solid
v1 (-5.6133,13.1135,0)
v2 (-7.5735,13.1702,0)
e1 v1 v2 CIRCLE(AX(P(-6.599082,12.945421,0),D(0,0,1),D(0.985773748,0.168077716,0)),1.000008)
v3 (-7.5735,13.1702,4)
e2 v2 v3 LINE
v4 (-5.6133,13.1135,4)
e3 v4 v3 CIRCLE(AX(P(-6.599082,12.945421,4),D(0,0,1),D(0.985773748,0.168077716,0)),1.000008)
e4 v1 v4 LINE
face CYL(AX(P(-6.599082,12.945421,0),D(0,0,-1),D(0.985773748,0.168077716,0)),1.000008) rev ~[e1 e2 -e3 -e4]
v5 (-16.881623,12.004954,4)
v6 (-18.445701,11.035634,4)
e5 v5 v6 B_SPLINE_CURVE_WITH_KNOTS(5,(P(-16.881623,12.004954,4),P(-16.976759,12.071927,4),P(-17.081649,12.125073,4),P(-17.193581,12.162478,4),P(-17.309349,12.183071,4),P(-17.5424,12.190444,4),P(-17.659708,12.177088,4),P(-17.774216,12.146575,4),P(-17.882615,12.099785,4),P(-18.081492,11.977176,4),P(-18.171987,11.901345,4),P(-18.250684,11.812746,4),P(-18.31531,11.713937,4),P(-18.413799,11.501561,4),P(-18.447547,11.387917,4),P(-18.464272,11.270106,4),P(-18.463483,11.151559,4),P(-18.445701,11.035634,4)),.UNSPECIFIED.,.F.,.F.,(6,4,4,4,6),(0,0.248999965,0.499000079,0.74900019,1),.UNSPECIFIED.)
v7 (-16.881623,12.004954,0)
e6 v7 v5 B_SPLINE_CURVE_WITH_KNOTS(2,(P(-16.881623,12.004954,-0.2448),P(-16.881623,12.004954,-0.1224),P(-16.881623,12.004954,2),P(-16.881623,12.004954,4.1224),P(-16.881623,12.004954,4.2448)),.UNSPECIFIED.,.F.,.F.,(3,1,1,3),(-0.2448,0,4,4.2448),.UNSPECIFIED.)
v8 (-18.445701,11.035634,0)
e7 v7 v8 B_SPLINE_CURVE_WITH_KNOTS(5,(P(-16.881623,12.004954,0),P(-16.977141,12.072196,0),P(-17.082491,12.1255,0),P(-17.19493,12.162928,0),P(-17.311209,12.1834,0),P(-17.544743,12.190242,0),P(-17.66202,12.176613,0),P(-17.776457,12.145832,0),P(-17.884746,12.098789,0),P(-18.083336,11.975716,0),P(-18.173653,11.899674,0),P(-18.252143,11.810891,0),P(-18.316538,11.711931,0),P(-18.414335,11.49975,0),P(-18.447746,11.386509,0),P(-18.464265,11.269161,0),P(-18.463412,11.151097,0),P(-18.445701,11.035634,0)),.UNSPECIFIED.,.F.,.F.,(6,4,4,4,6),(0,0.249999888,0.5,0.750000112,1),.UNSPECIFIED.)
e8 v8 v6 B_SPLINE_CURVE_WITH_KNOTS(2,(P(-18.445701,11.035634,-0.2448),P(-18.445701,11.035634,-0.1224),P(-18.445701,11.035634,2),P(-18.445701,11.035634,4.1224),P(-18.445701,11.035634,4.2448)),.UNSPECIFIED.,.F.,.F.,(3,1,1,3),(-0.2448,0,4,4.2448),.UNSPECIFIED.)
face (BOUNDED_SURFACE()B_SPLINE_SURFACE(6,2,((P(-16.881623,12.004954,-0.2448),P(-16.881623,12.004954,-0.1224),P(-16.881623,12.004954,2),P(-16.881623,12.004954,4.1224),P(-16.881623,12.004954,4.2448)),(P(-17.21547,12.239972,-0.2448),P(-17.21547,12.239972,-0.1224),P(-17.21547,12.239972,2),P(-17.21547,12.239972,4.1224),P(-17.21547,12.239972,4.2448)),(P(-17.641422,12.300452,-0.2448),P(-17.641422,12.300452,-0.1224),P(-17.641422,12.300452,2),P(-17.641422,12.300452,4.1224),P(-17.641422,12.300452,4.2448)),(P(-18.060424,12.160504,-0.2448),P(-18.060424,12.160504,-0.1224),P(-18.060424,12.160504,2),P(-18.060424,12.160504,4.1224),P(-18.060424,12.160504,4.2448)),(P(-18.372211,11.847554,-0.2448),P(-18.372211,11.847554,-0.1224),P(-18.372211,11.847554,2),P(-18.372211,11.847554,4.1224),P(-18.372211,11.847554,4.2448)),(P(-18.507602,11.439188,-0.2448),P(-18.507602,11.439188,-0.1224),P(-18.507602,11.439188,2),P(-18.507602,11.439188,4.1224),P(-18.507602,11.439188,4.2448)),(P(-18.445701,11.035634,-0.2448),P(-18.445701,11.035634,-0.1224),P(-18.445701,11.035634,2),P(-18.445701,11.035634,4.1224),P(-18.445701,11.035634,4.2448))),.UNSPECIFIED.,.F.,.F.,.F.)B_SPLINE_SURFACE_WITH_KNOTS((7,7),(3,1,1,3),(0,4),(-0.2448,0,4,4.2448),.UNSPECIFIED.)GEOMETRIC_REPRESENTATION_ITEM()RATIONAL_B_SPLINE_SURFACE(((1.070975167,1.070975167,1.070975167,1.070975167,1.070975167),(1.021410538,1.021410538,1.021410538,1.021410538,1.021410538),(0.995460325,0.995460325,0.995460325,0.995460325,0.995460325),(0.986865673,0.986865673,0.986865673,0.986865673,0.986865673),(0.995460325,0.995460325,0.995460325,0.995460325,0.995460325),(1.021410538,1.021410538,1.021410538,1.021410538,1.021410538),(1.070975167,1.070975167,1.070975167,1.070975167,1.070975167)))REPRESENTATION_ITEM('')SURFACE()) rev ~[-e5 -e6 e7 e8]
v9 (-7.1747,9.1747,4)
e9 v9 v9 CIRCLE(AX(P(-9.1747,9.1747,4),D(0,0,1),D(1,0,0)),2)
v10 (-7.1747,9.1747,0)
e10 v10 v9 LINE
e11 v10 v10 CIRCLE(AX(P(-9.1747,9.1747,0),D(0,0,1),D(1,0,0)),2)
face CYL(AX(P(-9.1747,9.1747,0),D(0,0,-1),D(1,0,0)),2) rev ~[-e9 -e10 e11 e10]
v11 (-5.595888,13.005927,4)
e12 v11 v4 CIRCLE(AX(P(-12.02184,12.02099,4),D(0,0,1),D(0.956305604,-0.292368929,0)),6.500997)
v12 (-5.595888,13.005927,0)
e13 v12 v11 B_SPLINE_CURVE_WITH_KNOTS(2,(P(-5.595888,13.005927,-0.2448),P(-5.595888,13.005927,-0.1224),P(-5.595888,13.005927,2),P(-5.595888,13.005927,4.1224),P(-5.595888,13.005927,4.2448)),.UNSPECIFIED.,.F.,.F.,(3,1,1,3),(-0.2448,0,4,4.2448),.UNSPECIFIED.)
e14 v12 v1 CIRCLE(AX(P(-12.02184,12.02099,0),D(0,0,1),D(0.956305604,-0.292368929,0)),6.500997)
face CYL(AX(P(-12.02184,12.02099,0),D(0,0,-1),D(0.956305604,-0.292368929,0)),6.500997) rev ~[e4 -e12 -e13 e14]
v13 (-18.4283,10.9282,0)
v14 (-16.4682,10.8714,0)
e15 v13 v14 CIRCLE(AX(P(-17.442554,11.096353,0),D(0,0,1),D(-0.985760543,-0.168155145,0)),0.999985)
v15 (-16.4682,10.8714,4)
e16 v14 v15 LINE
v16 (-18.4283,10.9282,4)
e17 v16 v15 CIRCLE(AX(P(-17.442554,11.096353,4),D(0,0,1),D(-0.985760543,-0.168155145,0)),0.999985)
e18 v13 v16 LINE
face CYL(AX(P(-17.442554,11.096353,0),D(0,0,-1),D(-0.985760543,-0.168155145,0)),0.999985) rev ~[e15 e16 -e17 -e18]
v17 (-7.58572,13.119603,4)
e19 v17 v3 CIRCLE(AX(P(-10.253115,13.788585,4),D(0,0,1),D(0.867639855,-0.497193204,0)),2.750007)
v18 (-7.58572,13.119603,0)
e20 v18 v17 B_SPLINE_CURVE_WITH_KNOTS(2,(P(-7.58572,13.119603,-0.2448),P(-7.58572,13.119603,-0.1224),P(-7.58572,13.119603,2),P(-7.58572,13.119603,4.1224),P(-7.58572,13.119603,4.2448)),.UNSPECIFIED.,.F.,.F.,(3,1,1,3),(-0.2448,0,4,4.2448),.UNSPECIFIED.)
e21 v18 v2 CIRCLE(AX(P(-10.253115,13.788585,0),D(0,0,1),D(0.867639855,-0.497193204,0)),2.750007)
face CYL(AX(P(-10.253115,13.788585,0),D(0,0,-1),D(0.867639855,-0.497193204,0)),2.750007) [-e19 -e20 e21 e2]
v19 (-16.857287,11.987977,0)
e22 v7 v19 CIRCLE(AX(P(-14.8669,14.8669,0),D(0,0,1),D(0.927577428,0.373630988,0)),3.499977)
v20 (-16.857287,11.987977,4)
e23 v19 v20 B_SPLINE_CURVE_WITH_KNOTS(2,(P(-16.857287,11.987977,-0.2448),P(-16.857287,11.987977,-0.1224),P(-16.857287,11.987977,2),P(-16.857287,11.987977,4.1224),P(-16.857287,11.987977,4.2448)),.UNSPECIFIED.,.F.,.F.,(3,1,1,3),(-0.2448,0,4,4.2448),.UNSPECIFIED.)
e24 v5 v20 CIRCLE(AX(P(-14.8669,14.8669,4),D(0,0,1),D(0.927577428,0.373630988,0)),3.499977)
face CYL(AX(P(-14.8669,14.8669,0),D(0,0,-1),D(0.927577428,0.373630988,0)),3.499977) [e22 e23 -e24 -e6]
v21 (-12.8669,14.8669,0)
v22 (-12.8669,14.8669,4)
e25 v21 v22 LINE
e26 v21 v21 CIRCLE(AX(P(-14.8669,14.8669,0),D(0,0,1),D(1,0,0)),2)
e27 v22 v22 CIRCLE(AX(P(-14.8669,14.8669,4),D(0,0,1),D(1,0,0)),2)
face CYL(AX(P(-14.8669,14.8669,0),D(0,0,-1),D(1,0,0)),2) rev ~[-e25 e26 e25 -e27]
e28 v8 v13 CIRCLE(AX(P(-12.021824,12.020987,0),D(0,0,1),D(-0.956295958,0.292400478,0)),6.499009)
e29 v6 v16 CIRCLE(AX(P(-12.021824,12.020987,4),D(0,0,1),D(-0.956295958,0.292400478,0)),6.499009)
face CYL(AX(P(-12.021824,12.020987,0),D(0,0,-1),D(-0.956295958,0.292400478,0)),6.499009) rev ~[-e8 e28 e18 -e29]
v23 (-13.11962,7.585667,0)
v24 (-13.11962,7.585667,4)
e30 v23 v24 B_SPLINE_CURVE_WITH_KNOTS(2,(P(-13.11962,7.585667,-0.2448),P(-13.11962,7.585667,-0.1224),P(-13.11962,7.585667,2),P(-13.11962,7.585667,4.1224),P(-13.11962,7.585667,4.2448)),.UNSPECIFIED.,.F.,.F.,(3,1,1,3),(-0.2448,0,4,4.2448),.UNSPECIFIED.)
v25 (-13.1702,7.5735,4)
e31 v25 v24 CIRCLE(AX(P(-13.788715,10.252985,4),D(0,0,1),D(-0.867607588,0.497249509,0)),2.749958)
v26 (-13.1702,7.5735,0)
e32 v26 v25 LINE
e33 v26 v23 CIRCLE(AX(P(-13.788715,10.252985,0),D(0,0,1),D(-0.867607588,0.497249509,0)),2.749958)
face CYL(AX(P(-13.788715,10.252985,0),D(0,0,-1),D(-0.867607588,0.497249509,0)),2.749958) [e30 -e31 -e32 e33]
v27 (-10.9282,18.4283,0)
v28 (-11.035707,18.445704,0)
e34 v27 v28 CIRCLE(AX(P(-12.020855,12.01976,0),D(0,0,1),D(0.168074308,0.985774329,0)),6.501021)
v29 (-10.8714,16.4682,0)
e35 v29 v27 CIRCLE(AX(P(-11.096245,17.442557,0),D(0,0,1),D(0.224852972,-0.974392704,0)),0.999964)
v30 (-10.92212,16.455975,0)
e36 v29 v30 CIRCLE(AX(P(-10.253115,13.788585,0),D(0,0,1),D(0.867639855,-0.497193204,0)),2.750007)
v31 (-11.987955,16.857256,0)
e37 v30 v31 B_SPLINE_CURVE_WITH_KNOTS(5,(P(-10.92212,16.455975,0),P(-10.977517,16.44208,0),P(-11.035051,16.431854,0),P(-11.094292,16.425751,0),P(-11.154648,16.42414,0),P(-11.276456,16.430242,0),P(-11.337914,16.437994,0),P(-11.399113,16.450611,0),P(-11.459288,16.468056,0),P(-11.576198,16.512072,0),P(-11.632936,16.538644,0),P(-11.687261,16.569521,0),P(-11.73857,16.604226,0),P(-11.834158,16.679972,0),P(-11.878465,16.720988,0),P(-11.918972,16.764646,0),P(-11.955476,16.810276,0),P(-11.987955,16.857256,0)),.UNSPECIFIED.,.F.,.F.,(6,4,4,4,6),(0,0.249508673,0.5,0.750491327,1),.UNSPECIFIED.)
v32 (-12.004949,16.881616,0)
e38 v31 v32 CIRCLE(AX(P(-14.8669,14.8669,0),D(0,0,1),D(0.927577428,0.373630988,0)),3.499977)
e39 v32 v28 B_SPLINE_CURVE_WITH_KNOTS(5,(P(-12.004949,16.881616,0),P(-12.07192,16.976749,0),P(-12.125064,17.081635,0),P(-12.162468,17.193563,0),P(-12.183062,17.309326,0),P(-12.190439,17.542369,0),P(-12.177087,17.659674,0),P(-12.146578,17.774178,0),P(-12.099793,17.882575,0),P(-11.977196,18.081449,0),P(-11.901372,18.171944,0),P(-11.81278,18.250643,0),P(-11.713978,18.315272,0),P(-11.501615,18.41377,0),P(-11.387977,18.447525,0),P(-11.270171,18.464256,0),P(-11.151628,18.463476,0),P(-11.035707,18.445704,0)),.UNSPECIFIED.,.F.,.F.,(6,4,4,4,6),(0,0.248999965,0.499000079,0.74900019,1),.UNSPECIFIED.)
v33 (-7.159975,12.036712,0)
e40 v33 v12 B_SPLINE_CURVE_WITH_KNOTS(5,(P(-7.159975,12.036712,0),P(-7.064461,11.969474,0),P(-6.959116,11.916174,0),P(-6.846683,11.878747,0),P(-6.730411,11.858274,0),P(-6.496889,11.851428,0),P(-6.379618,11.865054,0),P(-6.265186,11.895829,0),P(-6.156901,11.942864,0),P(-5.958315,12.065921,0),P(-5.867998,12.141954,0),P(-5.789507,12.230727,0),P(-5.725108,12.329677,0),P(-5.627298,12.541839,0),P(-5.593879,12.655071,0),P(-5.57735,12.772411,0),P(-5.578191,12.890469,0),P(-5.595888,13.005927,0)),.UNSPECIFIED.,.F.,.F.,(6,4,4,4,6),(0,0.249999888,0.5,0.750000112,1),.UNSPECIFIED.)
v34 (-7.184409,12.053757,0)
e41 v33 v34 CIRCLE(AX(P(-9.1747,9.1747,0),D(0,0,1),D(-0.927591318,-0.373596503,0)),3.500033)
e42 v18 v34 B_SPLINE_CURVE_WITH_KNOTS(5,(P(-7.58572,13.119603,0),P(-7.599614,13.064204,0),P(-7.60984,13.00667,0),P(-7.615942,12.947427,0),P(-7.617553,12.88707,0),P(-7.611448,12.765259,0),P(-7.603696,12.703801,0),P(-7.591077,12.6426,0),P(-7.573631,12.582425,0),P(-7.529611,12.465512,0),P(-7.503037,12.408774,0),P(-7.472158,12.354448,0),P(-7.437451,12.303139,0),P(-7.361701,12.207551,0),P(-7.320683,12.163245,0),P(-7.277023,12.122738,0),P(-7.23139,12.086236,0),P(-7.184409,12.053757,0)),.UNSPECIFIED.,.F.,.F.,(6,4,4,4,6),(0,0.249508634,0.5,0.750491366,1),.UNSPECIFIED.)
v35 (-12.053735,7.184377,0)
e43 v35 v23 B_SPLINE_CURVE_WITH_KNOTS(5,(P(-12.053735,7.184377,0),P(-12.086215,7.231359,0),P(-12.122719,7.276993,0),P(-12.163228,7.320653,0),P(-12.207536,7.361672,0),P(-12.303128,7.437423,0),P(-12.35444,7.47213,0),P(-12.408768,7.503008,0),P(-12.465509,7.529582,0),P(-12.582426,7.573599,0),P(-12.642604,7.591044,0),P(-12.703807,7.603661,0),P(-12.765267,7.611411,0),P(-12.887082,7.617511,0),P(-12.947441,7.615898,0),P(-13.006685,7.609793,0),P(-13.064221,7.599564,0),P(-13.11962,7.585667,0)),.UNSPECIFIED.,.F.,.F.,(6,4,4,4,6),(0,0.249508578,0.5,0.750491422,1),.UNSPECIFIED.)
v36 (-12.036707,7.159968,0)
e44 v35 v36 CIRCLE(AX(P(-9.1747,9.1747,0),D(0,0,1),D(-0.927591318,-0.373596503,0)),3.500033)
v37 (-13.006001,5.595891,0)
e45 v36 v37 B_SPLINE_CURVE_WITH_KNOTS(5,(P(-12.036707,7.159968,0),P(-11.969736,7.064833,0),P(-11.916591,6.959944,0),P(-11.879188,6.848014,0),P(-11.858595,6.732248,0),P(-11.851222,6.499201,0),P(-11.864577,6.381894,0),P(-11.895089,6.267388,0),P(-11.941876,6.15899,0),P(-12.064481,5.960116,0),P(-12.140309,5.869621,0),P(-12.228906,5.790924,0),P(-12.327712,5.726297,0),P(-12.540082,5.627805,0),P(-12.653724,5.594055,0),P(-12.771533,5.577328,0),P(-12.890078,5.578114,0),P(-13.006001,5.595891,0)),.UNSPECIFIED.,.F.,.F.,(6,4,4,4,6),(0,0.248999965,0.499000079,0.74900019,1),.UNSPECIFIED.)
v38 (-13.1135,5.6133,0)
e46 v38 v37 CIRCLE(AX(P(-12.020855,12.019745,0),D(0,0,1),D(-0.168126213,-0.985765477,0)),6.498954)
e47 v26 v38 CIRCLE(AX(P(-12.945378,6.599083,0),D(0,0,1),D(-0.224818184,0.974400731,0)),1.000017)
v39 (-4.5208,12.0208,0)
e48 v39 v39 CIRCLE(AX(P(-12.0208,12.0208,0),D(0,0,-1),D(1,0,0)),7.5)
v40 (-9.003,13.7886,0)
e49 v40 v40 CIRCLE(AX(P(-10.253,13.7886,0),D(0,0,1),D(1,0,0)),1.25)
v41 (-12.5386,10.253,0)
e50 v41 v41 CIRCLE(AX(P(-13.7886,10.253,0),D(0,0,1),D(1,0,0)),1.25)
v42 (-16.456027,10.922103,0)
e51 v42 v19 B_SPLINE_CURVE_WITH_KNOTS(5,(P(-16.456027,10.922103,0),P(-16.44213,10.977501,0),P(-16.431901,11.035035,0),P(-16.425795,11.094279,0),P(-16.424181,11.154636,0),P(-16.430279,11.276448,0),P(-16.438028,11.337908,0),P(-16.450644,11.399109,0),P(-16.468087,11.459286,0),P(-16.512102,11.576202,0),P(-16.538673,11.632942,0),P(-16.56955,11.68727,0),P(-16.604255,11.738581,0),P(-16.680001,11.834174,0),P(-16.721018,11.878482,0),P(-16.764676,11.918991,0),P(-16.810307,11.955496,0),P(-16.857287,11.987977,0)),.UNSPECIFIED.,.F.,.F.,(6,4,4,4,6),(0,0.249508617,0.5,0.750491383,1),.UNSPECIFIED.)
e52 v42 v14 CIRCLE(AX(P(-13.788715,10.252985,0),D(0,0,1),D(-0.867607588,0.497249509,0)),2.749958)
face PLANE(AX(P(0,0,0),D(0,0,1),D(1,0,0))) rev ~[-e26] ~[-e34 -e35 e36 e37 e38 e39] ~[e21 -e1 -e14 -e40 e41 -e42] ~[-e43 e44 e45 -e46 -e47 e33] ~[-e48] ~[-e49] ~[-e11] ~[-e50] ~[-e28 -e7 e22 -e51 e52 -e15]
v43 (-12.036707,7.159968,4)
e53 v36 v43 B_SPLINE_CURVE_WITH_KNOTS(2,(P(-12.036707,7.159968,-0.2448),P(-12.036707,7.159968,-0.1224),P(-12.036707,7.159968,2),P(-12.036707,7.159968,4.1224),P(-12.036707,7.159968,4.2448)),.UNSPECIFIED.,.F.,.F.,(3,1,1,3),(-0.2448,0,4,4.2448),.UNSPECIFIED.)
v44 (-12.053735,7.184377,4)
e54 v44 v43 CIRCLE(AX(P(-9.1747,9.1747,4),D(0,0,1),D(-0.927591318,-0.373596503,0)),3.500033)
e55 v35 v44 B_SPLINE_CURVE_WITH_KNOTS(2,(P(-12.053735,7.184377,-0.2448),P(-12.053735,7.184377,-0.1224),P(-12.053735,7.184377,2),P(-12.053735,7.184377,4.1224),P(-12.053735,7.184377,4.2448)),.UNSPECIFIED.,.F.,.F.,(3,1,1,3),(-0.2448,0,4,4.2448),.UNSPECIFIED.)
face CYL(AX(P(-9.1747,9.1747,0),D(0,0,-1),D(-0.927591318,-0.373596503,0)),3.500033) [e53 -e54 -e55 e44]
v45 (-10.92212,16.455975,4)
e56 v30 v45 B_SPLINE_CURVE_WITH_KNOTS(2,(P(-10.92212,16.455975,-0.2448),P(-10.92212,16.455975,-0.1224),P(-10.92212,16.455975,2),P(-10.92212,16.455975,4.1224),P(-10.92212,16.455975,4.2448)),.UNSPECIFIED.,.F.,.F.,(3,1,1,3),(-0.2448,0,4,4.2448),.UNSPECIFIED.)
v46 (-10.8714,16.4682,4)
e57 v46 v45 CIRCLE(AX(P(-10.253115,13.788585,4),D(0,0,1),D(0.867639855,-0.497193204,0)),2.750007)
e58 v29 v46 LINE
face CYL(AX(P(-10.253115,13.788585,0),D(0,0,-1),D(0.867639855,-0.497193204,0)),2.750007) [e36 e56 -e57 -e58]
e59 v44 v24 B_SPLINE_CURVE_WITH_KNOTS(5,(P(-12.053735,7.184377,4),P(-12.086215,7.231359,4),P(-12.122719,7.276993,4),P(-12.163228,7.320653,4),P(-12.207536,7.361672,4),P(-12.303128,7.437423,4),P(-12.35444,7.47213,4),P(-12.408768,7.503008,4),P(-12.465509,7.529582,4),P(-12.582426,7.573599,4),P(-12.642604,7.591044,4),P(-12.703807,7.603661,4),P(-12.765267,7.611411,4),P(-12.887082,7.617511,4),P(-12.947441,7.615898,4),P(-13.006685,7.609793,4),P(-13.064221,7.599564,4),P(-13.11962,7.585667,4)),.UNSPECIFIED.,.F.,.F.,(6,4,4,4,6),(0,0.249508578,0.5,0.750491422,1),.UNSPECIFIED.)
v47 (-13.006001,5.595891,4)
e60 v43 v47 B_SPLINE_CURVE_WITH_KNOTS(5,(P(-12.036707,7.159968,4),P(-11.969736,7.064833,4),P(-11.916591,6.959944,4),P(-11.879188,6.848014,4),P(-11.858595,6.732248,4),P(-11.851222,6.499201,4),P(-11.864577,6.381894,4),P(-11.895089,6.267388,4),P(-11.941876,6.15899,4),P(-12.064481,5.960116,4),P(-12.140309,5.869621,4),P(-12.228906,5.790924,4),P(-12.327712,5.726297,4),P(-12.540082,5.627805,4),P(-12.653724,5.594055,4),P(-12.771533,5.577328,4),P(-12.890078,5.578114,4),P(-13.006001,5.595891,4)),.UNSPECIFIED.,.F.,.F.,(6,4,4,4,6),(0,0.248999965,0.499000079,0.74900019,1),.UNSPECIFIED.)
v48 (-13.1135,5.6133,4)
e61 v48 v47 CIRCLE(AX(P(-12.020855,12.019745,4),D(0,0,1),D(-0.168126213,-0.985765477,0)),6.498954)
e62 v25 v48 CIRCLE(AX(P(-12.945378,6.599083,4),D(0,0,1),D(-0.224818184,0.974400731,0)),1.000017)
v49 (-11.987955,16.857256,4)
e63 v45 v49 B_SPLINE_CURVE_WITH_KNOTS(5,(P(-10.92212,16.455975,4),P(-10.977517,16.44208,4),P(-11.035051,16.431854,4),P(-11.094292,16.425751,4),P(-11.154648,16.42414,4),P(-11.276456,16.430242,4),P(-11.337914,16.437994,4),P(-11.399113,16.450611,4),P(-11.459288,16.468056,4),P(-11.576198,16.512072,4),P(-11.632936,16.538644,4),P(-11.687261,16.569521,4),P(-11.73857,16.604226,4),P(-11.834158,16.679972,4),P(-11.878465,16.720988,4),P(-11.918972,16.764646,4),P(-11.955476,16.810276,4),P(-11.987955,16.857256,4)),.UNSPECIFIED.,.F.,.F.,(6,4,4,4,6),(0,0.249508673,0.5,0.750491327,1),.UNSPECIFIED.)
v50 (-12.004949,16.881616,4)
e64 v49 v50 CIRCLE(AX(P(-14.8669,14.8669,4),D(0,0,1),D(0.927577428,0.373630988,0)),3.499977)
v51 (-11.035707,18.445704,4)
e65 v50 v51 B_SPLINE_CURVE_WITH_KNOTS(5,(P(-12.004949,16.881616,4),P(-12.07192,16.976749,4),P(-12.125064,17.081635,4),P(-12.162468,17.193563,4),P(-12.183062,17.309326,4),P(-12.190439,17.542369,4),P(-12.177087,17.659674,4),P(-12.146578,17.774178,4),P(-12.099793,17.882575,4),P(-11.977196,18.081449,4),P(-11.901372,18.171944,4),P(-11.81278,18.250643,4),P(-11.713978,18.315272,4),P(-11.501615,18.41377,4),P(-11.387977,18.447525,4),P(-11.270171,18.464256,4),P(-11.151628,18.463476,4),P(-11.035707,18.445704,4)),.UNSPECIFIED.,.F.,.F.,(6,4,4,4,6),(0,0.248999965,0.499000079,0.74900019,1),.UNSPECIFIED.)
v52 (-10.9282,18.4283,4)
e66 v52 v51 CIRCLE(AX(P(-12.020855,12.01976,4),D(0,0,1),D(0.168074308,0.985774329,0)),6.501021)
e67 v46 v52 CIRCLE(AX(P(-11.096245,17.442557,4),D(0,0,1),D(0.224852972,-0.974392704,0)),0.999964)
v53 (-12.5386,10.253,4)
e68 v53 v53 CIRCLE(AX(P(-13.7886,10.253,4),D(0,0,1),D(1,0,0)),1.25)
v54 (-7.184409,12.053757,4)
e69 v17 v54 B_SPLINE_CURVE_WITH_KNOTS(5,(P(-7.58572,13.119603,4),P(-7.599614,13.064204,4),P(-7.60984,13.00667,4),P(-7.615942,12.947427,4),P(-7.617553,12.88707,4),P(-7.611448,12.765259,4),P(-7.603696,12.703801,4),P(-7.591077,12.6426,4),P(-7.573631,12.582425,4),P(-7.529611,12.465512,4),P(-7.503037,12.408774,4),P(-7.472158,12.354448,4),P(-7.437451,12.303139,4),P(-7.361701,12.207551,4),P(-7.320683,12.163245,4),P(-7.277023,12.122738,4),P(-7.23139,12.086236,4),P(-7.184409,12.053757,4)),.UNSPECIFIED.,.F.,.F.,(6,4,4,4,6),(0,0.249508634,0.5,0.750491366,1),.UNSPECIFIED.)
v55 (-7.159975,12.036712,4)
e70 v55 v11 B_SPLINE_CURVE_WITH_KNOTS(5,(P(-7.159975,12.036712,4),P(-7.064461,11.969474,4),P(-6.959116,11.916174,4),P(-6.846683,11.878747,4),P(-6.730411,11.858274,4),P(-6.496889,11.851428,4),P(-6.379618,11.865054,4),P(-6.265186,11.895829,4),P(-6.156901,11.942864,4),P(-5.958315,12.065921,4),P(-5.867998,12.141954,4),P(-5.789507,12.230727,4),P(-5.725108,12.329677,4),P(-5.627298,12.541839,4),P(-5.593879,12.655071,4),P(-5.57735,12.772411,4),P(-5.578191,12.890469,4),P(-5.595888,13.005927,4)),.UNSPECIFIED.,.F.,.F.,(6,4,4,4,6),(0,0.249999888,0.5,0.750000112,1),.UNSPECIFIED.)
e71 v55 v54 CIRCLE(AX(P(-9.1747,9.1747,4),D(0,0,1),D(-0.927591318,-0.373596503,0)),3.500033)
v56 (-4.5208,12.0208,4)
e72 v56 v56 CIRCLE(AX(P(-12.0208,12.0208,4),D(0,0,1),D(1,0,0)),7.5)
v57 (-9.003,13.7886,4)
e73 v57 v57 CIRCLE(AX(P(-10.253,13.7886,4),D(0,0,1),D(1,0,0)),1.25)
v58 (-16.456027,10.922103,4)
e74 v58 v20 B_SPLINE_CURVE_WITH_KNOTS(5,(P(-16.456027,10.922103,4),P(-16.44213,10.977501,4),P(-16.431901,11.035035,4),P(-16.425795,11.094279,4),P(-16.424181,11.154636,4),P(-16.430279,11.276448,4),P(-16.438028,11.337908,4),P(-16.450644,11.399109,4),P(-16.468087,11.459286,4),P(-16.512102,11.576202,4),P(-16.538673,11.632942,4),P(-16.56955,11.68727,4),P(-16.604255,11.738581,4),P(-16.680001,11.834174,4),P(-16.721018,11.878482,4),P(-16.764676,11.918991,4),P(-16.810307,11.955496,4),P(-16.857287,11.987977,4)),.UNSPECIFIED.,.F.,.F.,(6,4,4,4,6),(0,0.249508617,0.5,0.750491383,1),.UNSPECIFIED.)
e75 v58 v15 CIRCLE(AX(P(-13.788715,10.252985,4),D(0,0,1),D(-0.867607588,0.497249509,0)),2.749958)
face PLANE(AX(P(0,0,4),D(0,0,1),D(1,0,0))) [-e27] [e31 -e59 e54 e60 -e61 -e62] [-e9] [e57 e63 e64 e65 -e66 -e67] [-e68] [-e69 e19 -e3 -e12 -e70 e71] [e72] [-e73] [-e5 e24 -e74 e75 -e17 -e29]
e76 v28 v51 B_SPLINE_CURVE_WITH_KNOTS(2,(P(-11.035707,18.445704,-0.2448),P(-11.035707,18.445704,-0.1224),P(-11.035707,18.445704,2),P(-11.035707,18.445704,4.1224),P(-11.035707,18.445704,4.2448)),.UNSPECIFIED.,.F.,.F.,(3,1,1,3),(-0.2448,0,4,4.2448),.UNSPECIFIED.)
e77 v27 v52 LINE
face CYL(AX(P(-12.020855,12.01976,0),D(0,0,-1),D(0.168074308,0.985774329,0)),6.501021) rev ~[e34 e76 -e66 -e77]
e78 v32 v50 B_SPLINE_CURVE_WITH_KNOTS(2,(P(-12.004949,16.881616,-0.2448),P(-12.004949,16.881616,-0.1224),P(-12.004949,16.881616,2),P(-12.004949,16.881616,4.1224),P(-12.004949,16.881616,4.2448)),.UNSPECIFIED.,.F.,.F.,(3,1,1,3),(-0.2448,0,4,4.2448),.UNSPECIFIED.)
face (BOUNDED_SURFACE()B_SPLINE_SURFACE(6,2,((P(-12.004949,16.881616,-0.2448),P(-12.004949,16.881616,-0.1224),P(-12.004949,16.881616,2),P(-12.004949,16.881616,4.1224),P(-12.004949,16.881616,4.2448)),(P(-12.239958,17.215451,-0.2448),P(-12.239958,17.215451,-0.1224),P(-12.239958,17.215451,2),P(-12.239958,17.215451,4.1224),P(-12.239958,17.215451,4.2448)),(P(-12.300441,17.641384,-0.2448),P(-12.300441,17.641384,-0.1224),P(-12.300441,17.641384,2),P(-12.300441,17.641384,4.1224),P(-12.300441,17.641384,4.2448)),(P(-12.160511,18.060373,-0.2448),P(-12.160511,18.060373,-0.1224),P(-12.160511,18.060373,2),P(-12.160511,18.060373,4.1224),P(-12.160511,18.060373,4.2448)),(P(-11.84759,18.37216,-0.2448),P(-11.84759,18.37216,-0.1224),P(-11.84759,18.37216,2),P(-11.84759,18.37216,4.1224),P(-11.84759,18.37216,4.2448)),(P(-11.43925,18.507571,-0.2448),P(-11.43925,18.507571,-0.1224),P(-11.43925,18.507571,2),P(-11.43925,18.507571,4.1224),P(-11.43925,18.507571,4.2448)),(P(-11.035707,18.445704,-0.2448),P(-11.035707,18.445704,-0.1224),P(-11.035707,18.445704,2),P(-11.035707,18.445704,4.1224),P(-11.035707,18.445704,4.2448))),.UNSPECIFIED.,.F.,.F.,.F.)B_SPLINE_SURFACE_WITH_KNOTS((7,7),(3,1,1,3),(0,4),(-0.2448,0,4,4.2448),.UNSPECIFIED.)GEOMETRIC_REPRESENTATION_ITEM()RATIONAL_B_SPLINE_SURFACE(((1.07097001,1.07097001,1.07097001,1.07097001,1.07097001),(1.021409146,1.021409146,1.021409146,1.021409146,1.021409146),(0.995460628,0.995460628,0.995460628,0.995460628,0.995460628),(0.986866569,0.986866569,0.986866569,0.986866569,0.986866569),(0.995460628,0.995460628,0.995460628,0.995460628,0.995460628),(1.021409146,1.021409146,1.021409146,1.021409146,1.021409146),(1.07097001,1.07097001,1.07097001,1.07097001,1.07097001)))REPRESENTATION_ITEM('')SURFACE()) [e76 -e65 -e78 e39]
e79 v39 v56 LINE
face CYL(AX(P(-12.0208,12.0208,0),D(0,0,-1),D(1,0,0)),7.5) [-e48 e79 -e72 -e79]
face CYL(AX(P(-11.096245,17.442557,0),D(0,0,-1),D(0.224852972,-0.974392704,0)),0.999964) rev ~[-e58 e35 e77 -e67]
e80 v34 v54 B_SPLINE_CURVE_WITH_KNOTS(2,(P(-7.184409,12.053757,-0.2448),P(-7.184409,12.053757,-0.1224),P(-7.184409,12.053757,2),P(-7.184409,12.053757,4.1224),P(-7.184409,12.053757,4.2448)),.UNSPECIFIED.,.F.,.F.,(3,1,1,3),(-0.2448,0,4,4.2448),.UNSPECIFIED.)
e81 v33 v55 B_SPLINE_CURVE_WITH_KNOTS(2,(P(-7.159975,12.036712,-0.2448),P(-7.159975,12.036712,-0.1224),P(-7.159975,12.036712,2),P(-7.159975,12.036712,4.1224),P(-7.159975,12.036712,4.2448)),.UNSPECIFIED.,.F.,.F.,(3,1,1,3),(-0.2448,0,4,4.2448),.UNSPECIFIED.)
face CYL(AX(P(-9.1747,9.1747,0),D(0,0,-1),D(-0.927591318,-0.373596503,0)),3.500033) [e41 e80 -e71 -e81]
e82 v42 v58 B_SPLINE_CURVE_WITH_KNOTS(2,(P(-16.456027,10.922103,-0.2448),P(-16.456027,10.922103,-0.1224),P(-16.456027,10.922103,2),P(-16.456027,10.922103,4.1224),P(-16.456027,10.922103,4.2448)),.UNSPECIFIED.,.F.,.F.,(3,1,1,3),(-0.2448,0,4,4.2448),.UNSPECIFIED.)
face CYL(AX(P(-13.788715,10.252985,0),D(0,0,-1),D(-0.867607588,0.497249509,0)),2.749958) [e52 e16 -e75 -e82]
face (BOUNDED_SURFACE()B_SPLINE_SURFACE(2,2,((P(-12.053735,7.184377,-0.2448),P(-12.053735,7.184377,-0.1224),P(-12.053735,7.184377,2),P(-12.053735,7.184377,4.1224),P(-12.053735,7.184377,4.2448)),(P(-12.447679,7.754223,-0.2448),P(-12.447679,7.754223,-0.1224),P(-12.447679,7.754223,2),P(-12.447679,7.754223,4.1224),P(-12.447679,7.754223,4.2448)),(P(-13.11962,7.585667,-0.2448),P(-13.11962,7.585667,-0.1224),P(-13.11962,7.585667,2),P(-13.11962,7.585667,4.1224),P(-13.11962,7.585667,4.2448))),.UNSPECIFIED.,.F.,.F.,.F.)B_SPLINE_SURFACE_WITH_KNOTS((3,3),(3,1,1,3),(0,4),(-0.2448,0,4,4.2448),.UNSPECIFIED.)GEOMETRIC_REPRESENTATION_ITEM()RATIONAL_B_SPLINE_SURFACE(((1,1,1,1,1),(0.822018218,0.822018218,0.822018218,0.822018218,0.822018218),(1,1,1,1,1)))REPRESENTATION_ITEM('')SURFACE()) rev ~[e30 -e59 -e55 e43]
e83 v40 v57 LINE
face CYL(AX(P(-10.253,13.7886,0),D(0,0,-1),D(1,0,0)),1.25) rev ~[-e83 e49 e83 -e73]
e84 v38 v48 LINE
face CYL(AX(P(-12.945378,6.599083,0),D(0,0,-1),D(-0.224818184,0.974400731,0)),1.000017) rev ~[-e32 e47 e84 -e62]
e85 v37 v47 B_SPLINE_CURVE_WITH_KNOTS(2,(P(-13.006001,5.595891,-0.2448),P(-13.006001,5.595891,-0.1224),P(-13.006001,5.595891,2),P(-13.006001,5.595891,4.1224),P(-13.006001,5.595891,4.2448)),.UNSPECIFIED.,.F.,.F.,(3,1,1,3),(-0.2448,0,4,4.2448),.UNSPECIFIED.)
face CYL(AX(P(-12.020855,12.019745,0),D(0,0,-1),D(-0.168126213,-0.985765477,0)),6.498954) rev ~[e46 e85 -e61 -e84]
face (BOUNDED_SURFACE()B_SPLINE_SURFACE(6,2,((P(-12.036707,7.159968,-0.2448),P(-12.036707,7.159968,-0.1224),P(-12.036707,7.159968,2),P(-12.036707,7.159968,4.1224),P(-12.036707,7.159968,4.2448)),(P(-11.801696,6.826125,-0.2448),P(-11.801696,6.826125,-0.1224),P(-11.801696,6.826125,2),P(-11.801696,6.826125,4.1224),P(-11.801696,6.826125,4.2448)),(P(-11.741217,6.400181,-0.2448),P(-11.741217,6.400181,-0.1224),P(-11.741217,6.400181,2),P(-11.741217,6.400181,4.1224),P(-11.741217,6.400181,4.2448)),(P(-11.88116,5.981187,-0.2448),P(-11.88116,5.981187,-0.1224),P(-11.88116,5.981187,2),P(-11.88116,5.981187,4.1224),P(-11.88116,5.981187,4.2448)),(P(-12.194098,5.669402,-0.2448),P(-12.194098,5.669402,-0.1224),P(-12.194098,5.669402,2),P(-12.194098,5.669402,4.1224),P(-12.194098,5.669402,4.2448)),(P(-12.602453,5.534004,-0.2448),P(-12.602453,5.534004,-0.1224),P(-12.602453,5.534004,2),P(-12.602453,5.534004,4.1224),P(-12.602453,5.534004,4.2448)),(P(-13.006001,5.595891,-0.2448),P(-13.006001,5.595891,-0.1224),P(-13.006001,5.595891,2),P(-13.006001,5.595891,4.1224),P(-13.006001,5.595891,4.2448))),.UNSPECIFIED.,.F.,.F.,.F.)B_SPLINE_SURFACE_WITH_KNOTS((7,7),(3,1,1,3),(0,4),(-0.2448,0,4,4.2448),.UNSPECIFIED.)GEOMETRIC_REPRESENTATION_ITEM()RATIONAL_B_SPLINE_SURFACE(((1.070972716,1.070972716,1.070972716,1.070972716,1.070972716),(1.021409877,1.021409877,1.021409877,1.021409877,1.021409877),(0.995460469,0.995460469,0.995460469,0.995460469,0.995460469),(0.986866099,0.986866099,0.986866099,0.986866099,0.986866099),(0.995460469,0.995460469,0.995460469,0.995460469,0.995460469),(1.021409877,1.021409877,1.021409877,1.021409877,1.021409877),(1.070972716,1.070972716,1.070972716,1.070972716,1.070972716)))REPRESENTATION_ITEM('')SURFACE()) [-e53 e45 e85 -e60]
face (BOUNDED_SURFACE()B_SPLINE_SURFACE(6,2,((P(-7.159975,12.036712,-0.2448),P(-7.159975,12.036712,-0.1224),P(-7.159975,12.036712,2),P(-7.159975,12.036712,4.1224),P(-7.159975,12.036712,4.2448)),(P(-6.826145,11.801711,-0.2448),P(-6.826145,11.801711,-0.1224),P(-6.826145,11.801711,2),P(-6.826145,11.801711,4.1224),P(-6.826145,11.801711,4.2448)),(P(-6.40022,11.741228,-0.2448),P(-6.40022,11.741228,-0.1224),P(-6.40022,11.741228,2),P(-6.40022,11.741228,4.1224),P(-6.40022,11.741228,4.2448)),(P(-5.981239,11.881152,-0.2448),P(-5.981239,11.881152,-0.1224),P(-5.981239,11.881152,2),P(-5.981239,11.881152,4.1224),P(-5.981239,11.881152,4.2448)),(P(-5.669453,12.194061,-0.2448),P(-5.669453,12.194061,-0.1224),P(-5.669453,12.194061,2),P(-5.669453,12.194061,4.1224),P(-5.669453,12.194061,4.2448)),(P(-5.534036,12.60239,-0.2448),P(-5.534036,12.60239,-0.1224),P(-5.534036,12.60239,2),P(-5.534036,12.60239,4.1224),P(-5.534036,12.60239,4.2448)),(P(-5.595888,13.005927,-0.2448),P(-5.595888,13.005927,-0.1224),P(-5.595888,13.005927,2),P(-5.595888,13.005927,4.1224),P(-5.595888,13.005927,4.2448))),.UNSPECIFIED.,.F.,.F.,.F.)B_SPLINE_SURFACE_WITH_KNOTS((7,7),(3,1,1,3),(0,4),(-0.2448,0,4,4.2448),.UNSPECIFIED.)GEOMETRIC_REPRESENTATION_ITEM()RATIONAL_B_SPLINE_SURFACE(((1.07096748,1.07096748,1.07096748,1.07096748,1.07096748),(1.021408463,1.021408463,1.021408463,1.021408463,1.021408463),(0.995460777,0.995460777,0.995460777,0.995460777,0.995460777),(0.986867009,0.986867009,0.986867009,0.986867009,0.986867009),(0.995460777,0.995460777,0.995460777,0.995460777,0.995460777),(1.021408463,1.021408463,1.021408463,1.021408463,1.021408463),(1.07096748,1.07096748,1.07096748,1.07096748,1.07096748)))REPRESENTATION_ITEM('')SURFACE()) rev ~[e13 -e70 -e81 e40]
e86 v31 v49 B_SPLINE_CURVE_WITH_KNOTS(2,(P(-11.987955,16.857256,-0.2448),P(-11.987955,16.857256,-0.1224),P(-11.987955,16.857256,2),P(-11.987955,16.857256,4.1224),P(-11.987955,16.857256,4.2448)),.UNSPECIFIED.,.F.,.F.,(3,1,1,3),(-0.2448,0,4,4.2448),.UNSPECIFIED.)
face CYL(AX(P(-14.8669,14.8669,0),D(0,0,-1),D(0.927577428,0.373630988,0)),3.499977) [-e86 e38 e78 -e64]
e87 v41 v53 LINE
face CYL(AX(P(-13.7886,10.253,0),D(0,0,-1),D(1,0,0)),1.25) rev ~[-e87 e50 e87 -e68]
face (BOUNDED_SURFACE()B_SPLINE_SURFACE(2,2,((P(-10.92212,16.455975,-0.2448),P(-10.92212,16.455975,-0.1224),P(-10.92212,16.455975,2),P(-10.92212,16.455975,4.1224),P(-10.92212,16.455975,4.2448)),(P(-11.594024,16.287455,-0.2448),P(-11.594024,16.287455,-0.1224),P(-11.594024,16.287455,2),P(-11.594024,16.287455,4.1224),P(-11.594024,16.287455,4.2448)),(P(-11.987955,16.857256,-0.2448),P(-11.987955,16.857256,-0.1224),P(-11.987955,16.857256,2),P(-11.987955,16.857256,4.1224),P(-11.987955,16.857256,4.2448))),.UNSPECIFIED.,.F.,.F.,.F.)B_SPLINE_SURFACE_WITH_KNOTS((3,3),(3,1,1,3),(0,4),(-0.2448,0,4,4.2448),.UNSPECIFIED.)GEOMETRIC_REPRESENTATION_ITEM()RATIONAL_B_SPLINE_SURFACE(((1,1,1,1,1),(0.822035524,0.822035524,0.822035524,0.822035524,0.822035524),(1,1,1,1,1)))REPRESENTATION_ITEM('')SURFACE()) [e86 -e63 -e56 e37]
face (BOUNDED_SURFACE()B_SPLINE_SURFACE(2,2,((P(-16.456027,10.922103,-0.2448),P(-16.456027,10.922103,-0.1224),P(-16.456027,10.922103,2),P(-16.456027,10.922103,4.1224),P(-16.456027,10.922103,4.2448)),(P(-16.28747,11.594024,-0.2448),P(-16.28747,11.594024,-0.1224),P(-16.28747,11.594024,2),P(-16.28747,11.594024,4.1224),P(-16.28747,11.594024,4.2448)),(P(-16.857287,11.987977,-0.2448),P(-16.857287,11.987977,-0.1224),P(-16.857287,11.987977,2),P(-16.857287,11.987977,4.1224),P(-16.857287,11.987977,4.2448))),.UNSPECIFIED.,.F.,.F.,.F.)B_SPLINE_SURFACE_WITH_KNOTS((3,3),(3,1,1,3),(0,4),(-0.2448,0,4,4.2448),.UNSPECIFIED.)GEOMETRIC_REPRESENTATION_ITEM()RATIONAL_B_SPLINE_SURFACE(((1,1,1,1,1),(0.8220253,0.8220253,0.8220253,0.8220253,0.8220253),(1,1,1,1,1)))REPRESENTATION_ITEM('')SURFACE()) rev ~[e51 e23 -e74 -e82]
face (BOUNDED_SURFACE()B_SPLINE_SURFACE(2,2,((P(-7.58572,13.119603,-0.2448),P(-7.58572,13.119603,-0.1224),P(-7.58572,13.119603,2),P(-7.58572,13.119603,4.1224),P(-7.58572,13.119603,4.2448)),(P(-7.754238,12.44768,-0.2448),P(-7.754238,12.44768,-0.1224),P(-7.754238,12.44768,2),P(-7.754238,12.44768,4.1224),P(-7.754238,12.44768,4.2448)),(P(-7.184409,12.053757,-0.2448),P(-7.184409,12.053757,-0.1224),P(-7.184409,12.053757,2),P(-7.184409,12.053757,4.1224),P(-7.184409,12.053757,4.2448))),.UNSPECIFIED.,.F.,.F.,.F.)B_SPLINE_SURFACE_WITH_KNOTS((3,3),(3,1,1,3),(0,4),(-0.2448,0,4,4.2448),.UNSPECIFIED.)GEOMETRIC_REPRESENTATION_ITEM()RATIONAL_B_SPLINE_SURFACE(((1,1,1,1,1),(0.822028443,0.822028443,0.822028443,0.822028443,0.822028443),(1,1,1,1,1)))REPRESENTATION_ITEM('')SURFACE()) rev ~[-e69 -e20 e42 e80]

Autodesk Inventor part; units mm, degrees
ref_plane "YZ Plane" through (0, 0, 0) normal (1, 0, 0) x (0, 1, 0)
ref_plane "XZ Plane" through (0, 0, 0) normal (0, 1, 0) x (-1, 0, 0)
ref_plane "XY Plane" through (0, 0, 0) normal (0, 0, 1) x (1, 0, 0)
sketch "スケッチ1" plane through (0, 0, 0) normal (0, 0, 1) x (1, 0, 0)
  circle A0 centre (-12.0208, 12.0208) radius 9.5
  arc A1 (-18.7383, 18.7383) -> (-18.7383, -18.7383) centre (0, 0) ccw
  circle A2 centre (-14.8669, 14.8669) radius 2
  circle A3 centre (-10.253, 13.7886) radius 1.25
  circle A4 centre (-13.7886, 10.253) radius 1.25
  circle A5 centre (-9.1747, 9.1747) radius 2
  circle A6 centre (-12.0208, -12.0208) radius 9.5
  arc A7 (-8.2499, -13.092) -> (-13.092, -8.2499) centre (-9.1747, -9.1747) ccw
  circle A8 centre (-9.1747, -9.1747) radius 2
  circle A9 centre (-13.7886, -10.253) radius 1.25
  arc A10 (-13.9423, -9.0125) -> (-13.092, -8.2499) centre (-14.0653, -8.0201) ccw
  arc A11 (-15.7917, -10.9496) -> (-15.0291, -10.0993) centre (-16.0215, -9.9764) ccw
  arc A12 (-15.7917, -10.9496) -> (-10.9496, -15.7917) centre (-14.8669, -14.8669) ccw
  circle A13 centre (-14.8669, -14.8669) radius 2
  circle A14 centre (-10.253, -13.7886) radius 1.25
  arc A15 (-10.0993, -15.0291) -> (-10.9496, -15.7917) centre (-9.9764, -16.0215) ccw
  arc A16 (-10.0993, -15.0291) -> (-9.0125, -13.9423) centre (-10.253, -13.7886) ccw
  arc A17 (-8.2499, -13.092) -> (-9.0125, -13.9423) centre (-8.0201, -14.0653) ccw
  arc A18 (-7.6297, -14.4272) -> (-14.4272, -7.6297) centre (-9.1747, -9.1747) ccw
  arc A19 (-9.6145, -16.412) -> (-7.6297, -14.4272) centre (-10.253, -13.7886) ccw
  arc A20 (-16.412, -9.6145) -> (-9.6145, -16.412) centre (-14.8669, -14.8669) ccw
  arc A21 (-14.4272, -7.6297) -> (-16.412, -9.6145) centre (-13.7886, -10.253) ccw
  arc A22 (-11.6204, 16.1746) -> (-16.1746, 11.6204) centre (-14.8669, 14.8669) ccw
  arc A23 (-7.8671, 12.4213) -> (-11.6204, 16.1746) centre (-10.253, 13.7886) ccw
  arc A24 (-16.1746, 11.6204) -> (-12.4213, 7.8671) centre (-13.7886, 10.253) ccw
  arc A25 (-12.4213, 7.8671) -> (-7.8671, 12.4213) centre (-9.1747, 9.1747) ccw
  circle A26 centre (-12.0208, -12.0208) radius 8
  line L0 (-25.4165, 7.5) -> (-25.4165, -7.5)
  line L1 (-23.9165, 7.2801) -> (-23.9165, -7.2801)
  arc A27 (-21.491, 12.7724) -> (-23.9165, 7.2801) centre (0, 0) ccw
  arc A28 (-23.9165, -7.2801) -> (-21.491, -12.7724) centre (0, 0) ccw
  line L2 (-2.5208, 12.0208) -> (-2.5208, -12.0208)
  line L3 (-4.0208, 6.8973) -> (-4.0208, -6.8973)
  circle A29 centre (-12.0208, 12.0208) radius 7.5
  line L4 (-13.7886, -10.253) -> (-4.0461, -19.9955) construction
  line L5 (-13.7886, 10.253) -> (-4.0869, 19.9547) construction
  line L6 (-12.7708, 2.5505) -> (-12.7708, -2.5505)
  line L7 (-11.2708, 2.5505) -> (-11.2708, -2.5505)
  arc A30 (-10.8714, 16.4682) -> (-10.9282, 18.4283) centre (-11.0963, 17.4426) ccw
  arc A31 (-5.6133, 13.1135) -> (-7.5735, 13.1702) centre (-6.5991, 12.9454) ccw
  arc A32 (-13.1702, 7.5735) -> (-13.1135, 5.6133) centre (-12.9454, 6.5991) ccw
  arc A33 (-18.4283, 10.9282) -> (-16.4682, 10.8714) centre (-17.4426, 11.0963) ccw
  arc A34 (-10.9282, 18.4283) -> (-13.9213, 18.2368) centre (-12.0208, 12.0208) ccw
  arc A35 (-18.2368, 13.9213) -> (-18.4283, 10.9282) centre (-12.0208, 12.0208) ccw
  arc A36 (-13.1135, 5.6133) -> (-10.1203, 5.8049) centre (-12.0208, 12.0208) ccw
  arc A37 (-5.8049, 10.1203) -> (-5.6133, 13.1135) centre (-12.0208, 12.0208) ccw
  point P0 (0, 0)
  point P1 (0, 0)
  point P2 (-5.3033, -18.7383)
  point P3 (-5.3033, 18.7383)
  dimension "d0" = 1.45
  dimension "d1" = 1.45
  dimension "d2" = 1.5
  dimension "d3" = 1.5
  dimension "d4" = 1.5
  dimension "d5" = 1.5
  dimension "d6" = 1.5
  dimension "d7" = 15
  dimension "d8" = 1.5
  dimension "d9" = 1.5
  dimension "d10" = 1.5
  dimension "d11" = 1.5
  dimension "d12" = 15
  dimension "d13" = 1.5
  dimension "d14" = 0.75
  dimension "d16" = 2
  dimension "d17" = 2
  dimension "d18" = 2
  dimension "d19" = 2
  dimension "d23" = 4
  dimension "d24" = 4
  dimension "d25" = 1
  dimension "d26" = 1
  dimension "d27" = 1
  dimension "d28" = 1
extrude "押し出し1" add sketch "スケッチ1" along normal blind 4 contours A23 A25 A29 A24 A22 | A22 A29 A25 A37 A31 A23 A30 A34 | A22 A35 A33 A24 A32 A36 A25 A29
fillet "フィレット1" radius 1 8 edges at (-10.1203, 5.8049, 2) (-12.4213, 7.8671, 2) (-16.1746, 11.6204, 2) (-18.2368, 13.9213, 2) (-7.8671, 12.4213, 2) (-5.8049, 10.1203, 2) (-13.9213, 18.2368, 2) (-11.6204, 16.1746, 2)
properties part number "新型３脚カム" material "アルミニウム 7075"
